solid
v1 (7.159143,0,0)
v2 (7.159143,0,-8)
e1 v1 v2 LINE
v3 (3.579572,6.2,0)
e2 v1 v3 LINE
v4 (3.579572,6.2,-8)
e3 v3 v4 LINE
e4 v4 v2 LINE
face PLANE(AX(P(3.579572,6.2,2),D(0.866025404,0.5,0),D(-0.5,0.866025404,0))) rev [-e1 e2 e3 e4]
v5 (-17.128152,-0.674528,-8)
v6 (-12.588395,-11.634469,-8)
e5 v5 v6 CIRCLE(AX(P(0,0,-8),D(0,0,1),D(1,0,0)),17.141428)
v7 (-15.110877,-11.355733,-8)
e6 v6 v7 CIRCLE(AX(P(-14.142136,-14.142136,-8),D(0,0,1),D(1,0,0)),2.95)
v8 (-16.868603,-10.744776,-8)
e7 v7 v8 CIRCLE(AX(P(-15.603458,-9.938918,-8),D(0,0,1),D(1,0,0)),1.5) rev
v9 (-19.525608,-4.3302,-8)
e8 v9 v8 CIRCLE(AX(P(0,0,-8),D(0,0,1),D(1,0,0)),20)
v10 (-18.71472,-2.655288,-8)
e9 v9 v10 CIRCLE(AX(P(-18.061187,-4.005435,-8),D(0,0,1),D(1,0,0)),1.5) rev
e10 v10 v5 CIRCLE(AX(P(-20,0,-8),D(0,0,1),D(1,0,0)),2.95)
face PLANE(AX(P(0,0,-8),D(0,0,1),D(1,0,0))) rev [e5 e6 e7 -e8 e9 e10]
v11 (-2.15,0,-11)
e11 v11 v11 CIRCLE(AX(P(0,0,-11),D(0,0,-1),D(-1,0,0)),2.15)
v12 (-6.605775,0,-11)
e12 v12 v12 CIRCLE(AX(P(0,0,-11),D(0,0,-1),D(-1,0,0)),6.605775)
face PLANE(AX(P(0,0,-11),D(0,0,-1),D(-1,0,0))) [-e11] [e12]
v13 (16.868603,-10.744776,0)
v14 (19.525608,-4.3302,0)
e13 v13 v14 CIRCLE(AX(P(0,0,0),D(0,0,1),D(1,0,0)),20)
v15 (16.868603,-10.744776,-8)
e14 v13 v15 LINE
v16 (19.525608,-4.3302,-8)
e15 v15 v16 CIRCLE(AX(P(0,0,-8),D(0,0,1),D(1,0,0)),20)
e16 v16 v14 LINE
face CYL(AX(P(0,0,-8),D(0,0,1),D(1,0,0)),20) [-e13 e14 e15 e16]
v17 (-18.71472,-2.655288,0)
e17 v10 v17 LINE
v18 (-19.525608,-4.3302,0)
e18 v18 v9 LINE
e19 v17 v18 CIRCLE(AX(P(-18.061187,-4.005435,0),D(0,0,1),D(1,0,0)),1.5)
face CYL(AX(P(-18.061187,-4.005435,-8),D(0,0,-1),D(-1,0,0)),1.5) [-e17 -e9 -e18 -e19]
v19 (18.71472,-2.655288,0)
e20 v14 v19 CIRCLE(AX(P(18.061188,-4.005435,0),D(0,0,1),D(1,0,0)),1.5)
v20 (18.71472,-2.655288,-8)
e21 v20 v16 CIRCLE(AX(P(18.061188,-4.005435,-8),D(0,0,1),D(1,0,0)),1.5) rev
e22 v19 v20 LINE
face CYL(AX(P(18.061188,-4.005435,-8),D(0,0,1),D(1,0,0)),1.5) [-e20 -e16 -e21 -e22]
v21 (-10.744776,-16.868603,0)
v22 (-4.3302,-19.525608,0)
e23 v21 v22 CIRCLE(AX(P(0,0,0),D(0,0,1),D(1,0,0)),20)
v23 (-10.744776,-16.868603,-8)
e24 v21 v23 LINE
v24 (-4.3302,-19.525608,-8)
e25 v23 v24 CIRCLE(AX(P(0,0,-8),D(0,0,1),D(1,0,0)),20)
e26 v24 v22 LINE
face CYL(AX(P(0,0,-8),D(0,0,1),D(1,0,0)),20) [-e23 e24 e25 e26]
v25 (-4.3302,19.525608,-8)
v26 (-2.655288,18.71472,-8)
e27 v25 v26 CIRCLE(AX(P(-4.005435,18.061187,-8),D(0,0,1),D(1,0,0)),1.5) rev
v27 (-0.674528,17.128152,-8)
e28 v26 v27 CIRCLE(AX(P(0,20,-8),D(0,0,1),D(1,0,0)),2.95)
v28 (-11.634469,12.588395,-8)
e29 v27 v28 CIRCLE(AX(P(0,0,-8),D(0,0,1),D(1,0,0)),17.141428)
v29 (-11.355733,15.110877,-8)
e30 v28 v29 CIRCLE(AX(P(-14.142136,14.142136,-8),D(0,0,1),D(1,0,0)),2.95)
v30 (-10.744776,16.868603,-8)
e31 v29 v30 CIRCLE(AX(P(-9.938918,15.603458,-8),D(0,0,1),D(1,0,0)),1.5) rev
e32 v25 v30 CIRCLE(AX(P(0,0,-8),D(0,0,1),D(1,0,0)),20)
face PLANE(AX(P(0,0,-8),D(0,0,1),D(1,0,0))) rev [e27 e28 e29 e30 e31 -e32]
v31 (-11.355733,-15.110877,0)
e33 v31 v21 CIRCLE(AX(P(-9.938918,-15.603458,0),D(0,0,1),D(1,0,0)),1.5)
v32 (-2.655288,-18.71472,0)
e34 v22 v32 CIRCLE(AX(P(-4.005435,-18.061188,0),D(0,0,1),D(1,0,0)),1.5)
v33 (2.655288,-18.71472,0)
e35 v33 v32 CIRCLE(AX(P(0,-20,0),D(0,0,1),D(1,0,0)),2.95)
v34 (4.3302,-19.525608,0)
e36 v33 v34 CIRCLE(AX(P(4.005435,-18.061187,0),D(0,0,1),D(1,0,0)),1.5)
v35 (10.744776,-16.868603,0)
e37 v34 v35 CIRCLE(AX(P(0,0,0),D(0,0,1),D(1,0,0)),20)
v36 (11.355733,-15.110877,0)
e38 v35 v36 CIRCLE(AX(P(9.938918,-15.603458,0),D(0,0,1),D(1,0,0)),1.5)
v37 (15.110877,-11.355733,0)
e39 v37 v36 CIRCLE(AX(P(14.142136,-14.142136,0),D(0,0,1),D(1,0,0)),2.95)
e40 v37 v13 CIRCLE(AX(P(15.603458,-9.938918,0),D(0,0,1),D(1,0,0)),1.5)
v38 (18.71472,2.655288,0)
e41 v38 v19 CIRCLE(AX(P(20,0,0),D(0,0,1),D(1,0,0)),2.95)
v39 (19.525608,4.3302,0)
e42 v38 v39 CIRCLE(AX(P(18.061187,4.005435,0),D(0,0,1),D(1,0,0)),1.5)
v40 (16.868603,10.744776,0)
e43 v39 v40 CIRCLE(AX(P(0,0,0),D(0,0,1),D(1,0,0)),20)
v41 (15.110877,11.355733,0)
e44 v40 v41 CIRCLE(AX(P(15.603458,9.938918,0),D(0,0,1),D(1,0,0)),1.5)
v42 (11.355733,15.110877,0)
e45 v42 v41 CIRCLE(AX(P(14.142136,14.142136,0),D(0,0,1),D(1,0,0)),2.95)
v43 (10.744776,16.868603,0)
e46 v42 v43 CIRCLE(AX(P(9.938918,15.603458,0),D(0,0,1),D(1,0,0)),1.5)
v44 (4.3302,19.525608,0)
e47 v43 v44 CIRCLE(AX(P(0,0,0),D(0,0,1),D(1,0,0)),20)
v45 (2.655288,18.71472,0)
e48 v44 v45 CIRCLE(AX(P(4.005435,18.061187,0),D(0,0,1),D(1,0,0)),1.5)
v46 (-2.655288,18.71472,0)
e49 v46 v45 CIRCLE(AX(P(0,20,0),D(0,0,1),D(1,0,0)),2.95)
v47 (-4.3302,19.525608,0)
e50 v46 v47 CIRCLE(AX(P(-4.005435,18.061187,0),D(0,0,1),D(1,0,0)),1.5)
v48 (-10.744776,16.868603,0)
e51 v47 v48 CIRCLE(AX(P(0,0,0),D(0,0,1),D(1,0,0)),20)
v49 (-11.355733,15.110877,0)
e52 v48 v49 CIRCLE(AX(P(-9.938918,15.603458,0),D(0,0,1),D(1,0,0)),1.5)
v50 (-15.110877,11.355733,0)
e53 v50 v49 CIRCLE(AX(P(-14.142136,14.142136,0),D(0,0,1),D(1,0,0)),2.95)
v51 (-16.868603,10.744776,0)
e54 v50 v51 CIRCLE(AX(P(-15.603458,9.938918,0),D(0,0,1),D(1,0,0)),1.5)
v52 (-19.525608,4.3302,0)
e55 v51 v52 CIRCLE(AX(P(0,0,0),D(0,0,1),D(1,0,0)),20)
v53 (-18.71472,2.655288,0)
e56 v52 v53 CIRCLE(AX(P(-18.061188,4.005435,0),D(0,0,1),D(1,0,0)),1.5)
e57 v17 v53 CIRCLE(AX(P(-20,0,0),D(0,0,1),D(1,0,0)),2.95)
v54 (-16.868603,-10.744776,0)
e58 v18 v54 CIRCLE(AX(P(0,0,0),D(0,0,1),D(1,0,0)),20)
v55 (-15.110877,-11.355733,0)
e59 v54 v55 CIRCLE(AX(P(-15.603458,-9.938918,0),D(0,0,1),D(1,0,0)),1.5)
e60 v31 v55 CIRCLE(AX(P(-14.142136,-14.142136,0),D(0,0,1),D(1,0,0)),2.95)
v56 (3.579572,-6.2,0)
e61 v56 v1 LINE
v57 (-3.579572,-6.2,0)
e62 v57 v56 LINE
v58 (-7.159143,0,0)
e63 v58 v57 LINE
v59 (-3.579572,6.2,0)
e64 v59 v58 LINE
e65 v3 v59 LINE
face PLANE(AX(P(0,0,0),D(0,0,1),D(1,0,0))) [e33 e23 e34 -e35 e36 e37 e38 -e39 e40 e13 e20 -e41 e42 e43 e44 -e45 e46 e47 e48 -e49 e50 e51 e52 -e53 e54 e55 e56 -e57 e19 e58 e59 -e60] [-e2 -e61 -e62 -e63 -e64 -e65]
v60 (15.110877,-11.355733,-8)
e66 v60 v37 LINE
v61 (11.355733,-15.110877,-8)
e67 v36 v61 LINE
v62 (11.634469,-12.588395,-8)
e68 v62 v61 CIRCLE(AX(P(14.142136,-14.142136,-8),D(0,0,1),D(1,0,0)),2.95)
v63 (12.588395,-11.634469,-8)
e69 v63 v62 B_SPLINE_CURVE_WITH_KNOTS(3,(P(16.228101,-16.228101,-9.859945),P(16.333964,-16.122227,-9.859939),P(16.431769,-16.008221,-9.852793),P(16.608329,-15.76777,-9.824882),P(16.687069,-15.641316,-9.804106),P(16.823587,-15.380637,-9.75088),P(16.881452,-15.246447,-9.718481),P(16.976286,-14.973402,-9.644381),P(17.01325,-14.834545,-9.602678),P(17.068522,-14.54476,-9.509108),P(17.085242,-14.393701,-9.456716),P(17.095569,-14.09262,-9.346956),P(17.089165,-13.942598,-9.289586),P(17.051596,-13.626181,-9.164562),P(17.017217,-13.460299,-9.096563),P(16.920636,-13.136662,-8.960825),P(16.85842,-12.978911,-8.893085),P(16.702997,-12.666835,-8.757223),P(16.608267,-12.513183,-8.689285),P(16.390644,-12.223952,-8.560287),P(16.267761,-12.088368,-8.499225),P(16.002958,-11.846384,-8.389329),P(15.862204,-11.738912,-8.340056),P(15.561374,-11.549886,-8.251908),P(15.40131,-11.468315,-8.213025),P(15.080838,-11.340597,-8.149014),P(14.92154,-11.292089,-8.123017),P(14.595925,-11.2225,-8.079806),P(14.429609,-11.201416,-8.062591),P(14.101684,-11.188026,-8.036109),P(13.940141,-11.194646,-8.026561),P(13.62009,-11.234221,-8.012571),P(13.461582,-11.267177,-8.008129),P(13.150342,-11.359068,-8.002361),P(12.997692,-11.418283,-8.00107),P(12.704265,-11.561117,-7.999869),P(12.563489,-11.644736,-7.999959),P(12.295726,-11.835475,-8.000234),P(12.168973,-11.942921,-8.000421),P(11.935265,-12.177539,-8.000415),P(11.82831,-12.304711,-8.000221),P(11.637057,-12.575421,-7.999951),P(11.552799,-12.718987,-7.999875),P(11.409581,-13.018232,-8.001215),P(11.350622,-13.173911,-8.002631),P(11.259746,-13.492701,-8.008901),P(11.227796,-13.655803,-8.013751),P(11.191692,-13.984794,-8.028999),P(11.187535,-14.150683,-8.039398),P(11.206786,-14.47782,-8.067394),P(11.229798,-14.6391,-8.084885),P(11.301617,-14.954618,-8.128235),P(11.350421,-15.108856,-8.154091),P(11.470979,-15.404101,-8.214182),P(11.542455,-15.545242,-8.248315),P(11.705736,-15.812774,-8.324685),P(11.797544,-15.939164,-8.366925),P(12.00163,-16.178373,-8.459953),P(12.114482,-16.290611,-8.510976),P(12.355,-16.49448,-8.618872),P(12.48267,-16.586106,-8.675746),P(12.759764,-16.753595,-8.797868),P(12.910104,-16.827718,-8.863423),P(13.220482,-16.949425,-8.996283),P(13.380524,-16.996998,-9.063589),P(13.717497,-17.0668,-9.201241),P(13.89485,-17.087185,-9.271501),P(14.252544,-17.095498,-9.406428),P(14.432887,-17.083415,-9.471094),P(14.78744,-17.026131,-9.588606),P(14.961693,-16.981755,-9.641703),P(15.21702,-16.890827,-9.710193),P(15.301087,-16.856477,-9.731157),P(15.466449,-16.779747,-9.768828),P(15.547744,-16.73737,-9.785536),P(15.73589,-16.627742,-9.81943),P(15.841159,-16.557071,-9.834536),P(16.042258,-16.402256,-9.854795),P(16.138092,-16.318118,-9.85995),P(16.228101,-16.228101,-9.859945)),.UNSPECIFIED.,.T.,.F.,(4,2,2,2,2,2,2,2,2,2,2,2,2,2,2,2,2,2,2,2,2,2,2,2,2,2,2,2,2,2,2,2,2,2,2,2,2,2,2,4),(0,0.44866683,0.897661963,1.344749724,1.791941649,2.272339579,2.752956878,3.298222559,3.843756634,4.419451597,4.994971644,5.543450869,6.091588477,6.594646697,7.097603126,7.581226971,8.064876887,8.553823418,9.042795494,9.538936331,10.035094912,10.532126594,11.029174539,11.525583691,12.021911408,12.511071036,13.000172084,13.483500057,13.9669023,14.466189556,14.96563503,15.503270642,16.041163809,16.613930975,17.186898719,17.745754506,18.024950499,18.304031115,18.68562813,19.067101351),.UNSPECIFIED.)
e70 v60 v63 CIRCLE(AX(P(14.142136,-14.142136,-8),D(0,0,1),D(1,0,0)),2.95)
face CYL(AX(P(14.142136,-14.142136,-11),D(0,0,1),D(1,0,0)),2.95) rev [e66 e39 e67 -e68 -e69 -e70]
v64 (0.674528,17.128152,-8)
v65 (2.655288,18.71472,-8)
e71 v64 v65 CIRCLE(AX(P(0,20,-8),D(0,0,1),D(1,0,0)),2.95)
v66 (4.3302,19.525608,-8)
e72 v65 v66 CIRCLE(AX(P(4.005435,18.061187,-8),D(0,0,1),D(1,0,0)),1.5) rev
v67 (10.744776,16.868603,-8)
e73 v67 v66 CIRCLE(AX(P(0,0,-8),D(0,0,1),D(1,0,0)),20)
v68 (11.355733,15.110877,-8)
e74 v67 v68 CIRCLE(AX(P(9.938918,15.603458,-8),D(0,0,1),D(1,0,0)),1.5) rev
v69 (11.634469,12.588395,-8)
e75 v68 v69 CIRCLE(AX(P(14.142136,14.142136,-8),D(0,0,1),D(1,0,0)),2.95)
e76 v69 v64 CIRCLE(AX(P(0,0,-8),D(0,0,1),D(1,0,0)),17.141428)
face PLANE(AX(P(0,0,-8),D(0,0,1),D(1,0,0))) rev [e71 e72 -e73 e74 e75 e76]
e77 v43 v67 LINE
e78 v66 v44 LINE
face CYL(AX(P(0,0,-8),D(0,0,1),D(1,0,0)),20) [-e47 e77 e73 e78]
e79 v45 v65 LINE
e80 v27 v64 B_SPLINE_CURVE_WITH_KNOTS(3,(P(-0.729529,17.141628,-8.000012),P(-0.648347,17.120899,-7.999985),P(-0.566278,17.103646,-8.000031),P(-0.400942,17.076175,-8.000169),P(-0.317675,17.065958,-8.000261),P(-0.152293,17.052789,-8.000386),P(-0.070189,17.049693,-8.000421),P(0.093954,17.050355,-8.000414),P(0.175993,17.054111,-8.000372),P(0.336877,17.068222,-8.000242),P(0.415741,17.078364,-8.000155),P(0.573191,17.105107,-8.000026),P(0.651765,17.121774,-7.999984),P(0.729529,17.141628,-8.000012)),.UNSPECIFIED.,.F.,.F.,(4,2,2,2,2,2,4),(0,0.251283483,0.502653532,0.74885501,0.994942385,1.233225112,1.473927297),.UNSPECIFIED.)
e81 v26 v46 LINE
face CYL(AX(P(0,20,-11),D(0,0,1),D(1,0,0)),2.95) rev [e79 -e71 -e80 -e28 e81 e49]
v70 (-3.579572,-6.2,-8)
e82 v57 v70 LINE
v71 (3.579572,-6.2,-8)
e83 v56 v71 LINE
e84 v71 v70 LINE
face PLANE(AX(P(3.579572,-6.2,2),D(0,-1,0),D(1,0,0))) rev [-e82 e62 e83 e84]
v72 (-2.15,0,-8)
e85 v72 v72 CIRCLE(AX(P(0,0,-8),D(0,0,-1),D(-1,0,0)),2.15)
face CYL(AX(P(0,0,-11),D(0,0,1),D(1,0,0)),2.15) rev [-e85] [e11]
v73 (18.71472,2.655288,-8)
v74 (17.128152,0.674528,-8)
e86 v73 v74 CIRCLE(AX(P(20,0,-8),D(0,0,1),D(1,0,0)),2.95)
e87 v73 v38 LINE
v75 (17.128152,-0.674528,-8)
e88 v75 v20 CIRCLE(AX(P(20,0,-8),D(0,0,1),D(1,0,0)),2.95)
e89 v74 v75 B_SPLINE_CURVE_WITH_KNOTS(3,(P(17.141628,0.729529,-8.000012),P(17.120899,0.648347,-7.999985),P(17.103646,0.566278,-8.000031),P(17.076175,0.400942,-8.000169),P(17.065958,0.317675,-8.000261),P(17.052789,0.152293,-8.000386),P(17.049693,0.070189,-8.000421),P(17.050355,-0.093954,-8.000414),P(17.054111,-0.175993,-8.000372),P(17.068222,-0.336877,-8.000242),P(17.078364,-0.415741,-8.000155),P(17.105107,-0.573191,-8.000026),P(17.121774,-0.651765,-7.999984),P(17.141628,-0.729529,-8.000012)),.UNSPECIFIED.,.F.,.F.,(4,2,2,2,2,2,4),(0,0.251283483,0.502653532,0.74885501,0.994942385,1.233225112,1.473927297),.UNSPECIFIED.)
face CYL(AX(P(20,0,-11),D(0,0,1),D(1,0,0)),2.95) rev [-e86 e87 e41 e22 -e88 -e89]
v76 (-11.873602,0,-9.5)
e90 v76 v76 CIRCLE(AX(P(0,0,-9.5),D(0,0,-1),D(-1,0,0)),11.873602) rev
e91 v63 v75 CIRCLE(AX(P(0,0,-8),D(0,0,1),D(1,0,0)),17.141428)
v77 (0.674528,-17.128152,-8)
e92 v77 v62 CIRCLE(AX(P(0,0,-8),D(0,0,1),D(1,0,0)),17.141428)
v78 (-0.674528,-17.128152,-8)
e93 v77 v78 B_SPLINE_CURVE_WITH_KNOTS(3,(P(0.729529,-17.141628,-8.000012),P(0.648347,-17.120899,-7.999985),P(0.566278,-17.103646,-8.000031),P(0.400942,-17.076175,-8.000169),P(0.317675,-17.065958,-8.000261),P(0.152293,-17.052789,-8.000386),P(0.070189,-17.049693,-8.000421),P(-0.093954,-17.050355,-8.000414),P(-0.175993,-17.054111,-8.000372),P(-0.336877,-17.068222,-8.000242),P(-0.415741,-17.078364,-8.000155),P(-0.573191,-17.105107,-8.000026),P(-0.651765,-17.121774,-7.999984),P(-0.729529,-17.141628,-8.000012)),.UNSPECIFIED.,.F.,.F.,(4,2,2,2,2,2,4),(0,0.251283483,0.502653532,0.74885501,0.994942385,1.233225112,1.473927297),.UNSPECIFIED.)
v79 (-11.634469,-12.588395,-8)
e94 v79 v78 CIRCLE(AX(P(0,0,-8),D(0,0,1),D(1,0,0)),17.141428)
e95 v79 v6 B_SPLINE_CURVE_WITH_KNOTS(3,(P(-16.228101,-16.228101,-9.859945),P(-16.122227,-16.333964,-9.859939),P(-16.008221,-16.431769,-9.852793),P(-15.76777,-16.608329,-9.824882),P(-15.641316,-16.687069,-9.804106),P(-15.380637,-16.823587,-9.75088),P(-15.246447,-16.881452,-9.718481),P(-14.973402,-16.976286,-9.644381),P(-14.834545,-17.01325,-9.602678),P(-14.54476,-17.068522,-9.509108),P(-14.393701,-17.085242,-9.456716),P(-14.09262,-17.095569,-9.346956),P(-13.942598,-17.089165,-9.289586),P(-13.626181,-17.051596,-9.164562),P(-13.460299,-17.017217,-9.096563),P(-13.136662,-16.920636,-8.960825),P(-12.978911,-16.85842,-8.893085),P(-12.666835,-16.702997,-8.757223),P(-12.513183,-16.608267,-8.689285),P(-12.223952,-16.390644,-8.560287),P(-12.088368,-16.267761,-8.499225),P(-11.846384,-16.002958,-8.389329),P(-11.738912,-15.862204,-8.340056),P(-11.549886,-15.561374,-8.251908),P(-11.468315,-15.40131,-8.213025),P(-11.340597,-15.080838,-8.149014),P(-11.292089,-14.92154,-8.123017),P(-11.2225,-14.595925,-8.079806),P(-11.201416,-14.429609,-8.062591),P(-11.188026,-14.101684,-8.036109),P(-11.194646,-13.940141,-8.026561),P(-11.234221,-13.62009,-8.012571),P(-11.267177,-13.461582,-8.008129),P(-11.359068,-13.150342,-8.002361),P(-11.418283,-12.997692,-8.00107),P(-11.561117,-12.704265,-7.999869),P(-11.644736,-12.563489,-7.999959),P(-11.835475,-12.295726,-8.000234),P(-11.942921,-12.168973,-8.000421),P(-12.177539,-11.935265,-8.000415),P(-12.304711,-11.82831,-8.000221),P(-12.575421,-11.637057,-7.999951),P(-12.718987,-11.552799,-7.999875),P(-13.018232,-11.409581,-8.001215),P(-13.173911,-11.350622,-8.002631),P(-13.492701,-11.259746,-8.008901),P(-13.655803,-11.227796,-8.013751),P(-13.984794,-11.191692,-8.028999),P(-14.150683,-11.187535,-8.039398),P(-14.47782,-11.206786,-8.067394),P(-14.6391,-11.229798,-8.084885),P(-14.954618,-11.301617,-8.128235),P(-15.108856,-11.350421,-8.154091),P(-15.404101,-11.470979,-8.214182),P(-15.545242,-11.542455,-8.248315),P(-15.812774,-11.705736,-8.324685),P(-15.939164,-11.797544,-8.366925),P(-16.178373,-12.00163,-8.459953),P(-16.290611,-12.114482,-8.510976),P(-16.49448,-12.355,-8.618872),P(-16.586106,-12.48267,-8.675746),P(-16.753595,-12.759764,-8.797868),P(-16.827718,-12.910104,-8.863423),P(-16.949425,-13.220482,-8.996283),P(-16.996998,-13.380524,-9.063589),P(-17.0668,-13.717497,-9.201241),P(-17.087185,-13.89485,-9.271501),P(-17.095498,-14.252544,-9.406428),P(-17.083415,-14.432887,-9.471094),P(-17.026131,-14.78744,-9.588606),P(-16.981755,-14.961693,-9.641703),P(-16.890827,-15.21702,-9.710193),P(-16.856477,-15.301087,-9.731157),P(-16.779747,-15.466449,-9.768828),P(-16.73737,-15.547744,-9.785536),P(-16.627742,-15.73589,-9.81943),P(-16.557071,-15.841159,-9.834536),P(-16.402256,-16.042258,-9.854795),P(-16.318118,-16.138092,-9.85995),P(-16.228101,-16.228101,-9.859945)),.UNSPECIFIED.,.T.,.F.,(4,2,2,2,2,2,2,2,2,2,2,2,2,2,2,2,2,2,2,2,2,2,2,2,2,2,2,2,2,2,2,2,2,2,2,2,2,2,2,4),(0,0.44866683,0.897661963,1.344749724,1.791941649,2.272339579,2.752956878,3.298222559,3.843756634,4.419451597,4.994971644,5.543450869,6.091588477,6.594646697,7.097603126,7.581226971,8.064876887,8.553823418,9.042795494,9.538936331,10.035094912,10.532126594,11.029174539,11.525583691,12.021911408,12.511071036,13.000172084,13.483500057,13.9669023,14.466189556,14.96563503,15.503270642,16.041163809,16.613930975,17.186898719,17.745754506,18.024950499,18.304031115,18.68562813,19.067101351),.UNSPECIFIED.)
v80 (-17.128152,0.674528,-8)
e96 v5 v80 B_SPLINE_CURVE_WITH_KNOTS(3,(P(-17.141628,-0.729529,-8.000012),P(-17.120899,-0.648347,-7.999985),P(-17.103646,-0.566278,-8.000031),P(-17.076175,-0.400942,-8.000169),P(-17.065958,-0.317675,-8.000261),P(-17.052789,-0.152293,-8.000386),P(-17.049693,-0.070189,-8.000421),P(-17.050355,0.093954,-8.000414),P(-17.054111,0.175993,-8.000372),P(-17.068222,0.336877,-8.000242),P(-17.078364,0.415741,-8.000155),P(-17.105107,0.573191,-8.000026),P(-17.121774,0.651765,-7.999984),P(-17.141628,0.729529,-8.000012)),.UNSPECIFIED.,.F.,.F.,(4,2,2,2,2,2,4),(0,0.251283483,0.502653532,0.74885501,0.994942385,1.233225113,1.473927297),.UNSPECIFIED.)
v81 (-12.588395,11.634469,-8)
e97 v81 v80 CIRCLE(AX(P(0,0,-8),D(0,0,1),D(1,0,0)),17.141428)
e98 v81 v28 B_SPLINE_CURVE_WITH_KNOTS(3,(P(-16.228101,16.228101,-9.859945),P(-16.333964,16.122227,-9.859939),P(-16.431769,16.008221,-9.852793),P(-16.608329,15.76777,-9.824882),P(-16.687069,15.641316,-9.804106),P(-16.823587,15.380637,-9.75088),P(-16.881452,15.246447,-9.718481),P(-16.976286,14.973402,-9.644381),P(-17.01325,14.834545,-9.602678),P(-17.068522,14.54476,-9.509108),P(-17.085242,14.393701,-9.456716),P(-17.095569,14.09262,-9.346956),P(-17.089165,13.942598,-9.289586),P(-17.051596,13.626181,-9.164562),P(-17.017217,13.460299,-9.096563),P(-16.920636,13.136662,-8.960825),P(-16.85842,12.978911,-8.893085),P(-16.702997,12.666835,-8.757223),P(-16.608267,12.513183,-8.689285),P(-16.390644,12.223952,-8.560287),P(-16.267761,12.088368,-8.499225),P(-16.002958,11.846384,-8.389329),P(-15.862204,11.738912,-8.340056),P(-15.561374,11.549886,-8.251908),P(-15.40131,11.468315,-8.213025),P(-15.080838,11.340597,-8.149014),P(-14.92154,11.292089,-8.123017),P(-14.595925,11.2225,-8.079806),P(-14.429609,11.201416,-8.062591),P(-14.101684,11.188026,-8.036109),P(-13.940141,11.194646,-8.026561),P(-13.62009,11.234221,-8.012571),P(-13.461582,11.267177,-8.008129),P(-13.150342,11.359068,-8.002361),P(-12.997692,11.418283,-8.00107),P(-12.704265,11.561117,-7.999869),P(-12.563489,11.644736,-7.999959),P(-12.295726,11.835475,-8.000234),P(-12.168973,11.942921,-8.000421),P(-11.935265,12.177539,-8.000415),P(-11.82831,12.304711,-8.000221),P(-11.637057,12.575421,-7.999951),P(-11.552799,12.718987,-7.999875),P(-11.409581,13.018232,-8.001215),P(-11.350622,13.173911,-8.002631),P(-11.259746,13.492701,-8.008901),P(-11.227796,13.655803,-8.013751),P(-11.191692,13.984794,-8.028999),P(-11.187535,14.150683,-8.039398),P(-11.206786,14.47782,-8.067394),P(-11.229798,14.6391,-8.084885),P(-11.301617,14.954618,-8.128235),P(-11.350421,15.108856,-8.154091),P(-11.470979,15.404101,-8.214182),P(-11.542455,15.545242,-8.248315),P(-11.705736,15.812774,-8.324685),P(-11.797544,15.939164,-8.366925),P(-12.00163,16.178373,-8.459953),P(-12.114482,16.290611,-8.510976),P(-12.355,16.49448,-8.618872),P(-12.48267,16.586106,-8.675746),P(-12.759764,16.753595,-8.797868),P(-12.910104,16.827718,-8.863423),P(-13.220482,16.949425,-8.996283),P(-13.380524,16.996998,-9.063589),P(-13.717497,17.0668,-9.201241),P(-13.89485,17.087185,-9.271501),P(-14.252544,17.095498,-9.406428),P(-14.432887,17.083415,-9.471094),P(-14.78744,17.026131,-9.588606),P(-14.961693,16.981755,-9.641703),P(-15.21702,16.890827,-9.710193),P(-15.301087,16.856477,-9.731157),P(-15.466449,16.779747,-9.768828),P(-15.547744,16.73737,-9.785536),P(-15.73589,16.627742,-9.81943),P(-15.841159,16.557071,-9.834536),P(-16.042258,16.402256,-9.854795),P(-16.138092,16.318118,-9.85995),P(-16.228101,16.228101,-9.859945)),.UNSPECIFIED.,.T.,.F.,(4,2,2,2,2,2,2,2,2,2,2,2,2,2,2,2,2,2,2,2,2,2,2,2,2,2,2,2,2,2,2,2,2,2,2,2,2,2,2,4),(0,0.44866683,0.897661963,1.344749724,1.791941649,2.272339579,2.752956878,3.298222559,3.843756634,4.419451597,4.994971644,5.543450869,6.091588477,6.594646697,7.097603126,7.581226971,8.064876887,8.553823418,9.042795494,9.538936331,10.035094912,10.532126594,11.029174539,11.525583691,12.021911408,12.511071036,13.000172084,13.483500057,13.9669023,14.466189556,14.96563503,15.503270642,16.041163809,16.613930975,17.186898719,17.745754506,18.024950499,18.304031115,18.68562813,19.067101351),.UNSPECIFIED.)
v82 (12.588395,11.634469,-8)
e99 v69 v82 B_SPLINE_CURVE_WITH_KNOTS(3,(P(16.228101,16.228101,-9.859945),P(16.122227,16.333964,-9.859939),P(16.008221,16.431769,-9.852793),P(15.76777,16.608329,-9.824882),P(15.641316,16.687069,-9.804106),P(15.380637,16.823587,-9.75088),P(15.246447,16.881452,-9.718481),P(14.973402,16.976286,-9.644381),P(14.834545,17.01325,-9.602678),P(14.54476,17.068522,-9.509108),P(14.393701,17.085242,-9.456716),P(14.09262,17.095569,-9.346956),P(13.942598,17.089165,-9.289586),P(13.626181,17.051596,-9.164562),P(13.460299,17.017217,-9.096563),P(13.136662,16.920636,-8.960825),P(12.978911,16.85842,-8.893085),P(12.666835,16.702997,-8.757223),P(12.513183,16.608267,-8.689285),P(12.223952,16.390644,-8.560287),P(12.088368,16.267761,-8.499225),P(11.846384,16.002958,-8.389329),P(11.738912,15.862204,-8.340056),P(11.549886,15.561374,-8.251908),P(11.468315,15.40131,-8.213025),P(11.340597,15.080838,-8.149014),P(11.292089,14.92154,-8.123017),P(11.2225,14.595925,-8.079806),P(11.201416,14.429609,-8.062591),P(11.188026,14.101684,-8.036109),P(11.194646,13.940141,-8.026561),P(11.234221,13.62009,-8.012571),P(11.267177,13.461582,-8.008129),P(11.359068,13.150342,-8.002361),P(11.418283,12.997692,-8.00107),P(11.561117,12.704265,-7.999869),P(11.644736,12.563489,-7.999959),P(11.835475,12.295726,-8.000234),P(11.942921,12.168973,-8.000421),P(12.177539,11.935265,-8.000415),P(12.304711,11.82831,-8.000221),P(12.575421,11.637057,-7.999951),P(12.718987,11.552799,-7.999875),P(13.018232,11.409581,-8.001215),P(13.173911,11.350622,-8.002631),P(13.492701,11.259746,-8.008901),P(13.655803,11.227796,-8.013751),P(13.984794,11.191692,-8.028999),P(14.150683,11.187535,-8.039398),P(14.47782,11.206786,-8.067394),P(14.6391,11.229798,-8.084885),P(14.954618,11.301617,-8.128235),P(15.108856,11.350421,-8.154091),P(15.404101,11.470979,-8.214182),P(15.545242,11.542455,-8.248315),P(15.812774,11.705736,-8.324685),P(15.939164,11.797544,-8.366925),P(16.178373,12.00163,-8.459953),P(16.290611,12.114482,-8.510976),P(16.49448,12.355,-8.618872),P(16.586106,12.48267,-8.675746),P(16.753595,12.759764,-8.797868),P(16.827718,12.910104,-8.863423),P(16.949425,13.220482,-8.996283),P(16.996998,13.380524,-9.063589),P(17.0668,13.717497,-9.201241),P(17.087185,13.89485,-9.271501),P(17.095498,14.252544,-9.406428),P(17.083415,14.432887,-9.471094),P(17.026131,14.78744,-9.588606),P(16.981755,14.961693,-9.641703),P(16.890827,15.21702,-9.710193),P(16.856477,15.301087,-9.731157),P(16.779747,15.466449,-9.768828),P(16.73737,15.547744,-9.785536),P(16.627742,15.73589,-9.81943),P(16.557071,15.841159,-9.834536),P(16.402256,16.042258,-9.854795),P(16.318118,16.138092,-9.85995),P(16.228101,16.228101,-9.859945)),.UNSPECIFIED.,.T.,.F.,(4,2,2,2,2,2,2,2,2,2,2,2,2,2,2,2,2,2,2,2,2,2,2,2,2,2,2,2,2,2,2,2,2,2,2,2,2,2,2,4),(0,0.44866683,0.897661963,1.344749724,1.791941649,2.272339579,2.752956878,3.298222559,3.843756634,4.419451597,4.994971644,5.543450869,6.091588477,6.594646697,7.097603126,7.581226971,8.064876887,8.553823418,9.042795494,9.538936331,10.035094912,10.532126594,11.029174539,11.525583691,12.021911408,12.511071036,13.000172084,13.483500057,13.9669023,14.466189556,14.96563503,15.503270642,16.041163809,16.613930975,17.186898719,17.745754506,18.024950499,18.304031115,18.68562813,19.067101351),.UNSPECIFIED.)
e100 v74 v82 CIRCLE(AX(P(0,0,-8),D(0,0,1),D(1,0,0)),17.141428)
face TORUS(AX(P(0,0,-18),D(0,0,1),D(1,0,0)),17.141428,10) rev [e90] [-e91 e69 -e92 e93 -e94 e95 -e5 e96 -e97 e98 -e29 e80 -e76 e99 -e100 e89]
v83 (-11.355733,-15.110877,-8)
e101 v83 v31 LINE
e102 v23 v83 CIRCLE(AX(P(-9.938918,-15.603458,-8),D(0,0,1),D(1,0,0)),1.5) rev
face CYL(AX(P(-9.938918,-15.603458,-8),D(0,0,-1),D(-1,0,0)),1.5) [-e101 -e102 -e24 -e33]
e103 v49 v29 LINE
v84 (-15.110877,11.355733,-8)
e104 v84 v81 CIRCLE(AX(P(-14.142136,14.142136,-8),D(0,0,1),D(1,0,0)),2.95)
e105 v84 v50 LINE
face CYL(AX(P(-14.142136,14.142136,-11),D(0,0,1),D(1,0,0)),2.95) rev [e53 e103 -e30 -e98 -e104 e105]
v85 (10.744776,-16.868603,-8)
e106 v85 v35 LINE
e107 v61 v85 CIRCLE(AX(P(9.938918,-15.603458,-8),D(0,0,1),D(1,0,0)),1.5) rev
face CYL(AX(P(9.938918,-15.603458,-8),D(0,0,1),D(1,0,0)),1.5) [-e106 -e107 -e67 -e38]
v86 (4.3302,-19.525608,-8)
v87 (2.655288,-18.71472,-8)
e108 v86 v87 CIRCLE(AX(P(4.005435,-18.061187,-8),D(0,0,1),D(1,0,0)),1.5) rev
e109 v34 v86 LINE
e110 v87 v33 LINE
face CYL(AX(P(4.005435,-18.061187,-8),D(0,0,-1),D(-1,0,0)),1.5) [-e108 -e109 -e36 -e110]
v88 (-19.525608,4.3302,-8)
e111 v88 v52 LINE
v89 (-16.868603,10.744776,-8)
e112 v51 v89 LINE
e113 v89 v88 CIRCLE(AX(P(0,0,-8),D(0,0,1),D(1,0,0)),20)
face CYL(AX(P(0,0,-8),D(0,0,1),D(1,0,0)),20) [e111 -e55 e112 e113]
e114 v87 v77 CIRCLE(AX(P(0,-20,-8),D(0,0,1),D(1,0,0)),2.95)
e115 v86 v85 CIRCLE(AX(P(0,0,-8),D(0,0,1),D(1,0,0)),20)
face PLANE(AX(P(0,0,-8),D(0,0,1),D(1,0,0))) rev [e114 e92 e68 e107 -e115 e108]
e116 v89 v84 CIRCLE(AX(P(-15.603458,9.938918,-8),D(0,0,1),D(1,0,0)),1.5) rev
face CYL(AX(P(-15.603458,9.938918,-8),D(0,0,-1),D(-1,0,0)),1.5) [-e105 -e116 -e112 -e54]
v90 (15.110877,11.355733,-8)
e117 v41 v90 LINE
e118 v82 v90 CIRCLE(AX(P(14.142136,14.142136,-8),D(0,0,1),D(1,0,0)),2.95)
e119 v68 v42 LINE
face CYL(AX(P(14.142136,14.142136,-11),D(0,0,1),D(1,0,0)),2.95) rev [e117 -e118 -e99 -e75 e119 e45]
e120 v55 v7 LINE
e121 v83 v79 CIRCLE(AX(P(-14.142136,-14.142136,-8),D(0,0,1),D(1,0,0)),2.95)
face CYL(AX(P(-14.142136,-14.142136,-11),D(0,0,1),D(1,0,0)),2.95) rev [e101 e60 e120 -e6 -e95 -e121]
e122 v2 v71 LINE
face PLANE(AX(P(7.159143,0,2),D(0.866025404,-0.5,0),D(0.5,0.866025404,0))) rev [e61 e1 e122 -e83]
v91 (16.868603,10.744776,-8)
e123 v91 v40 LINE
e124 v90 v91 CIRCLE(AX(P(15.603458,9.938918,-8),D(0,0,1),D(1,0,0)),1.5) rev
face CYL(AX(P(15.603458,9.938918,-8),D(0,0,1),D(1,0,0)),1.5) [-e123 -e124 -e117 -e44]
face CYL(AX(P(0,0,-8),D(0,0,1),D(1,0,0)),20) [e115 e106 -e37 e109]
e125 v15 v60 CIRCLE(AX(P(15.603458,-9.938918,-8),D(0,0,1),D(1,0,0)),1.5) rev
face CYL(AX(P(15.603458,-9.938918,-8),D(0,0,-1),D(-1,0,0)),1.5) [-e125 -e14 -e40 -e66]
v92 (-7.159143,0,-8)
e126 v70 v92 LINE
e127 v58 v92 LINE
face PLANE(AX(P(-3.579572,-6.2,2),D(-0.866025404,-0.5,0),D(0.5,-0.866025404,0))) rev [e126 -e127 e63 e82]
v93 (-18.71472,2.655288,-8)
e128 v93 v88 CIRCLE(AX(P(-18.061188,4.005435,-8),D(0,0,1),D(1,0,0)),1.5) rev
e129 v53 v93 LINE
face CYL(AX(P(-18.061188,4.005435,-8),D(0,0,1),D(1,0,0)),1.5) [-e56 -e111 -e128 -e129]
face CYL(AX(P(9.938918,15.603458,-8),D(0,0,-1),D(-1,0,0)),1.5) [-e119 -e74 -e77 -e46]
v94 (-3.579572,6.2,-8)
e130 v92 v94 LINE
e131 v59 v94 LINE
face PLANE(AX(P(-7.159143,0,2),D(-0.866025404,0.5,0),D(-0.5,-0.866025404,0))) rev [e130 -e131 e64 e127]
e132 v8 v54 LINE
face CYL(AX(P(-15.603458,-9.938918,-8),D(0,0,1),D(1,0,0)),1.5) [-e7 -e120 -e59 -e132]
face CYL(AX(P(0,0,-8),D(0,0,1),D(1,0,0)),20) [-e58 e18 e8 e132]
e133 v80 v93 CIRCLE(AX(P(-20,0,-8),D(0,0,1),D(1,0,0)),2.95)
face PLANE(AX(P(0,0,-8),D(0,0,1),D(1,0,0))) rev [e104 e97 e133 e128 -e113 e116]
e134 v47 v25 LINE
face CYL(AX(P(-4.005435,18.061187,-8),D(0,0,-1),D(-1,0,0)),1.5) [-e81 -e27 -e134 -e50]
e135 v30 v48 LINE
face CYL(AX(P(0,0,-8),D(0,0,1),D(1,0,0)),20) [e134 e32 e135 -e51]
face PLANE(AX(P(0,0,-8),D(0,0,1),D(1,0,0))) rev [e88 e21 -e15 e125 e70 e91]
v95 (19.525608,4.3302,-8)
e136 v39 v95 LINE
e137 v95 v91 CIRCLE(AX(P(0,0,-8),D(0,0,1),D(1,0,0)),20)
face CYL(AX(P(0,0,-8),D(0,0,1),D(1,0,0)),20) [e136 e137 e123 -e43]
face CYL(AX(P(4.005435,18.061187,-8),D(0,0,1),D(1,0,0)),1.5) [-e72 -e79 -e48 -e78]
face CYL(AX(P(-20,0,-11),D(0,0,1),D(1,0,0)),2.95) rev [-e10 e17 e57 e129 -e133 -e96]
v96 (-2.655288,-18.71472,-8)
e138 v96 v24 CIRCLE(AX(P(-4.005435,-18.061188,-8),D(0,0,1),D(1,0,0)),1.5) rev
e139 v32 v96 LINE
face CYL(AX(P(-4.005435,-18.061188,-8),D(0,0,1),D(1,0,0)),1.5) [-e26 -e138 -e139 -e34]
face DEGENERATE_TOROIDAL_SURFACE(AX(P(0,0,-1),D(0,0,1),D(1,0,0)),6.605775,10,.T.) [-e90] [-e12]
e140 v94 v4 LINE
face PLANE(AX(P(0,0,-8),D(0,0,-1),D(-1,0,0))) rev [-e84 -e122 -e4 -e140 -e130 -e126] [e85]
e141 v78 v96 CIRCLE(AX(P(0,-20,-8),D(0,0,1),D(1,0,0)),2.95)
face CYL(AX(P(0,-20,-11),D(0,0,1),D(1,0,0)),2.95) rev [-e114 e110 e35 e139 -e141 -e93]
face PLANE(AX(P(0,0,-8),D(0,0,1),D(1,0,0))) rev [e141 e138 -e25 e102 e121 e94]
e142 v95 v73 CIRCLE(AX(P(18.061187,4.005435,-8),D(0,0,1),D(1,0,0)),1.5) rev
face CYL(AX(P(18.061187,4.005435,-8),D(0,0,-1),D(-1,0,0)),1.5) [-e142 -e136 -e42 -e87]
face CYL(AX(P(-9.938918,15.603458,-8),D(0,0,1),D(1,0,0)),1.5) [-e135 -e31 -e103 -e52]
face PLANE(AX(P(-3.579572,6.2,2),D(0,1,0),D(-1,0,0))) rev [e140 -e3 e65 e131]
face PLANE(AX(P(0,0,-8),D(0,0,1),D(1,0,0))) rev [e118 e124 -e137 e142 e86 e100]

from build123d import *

# Parameters (mm, degrees)
CROQUIS1_R              = 20
SALIENTE_EXTRUIR1_DEPTH = 8
CORTAR_EXTRUIR1_DEPTH   = 8
CORTAR_EXTRUIR2_DEPTH   = 10
CROQUIS4_R              = 10
CROQUIS4_R_2            = 2.15
SALIENTE_EXTRUIR2_DEPTH = 3
REDONDEO1_R             = 10
REDONDEO2_R             = 10
CROQUIS5_R              = 2.95
CORTAR_EXTRUIR4_DEPTH   = 31.099222036
REDONDEO4_R             = 1.5


with BuildPart() as part:
    # Croquis1 → Saliente-Extruir1 (new body)
    with BuildSketch(Plane.XY):
        Circle(CROQUIS1_R)
        with BuildLine():
            Line((-1.204159458, 1.2), (1.204159458, 1.2))
            ThreePointArc((1.204159458, 1.2), (0, -1.7), (-1.204159458, 1.2))
        make_face(mode=Mode.SUBTRACT)
    extrude(amount=-SALIENTE_EXTRUIR1_DEPTH)

    # Croquis2 → Cortar-Extruir1 (cut)
    with BuildSketch(Plane.XY):
        with BuildLine():
            ThreePointArc((2.743493279, 19.8109375), (0, 20), (-2.743493279, 19.8109375))
            ThreePointArc((-2.743493279, 19.8109375), (0, 17.25), (2.743493279, 19.8109375))
        make_face()
        with BuildLine():
            ThreePointArc((-15.948597043, 12.068233192), (-12.197270604, 12.196913347), (-12.068700327, 15.948243553))
            ThreePointArc((-12.068700327, 15.948243553), (-14.142342736, 14.141928508), (-15.948597043, 12.068233192))
        make_face()
        with BuildLine():
            ThreePointArc((15.948184756, 12.068778024), (14.141928523, 14.142342722), (12.068310924, 15.948538223))
            ThreePointArc((12.068310924, 15.948538223), (12.197913345, 12.198270606), (15.948184756, 12.068778024))
        make_face()
        with BuildLine():
            ThreePointArc((-19.810790862, -2.744551953), (-17.249000003, -0.000862493), (-19.811065232, 2.742570761))
            ThreePointArc((-19.811065232, 2.742570761), (-19.999999975, -0.00100005), (-19.810790862, -2.744551953))
        make_face()
        with BuildLine():
            ThreePointArc((19.811084118, -2.742434336), (19.999999975, 0.00099995), (19.810809789, 2.744415332))
            ThreePointArc((19.810809789, 2.744415332), (17.251000003, 0.000862507), (19.811084118, -2.742434336))
        make_face()
        with BuildLine():
            ThreePointArc((-12.06710539, -15.949450383), (-12.196050859, -12.198133106), (-15.947390094, -12.069828051))
            ThreePointArc((-15.947390094, -12.069828051), (-14.140928423, -14.143342722), (-12.06710539, -15.949450383))
        make_face()
        with BuildLine():
            ThreePointArc((12.069905665, -15.947331352), (14.143342636, -14.140928508), (15.949391508, -12.067183206))
            ThreePointArc((15.949391508, -12.067183206), (12.199133118, -12.197050847), (12.069905665, -15.947331352))
        make_face()
        with BuildLine():
            ThreePointArc((2.745474352, -19.810663053), (0.001725, -17.250000014), (-2.741512165, -19.811211751))
            ThreePointArc((-2.741512165, -19.811211751), (0.002, -19.9999999), (2.745474352, -19.810663053))
        make_face()
    extrude(amount=-CORTAR_EXTRUIR1_DEPTH, mode=Mode.SUBTRACT)

    # Croquis3 → Cortar-Extruir2 (cut)
    with BuildSketch(Plane(origin=(0, 0, -8), x_dir=(-1, 0, 0), z_dir=(0, 0, -1))):
        Polygon((7.159143338, 0), (3.579571669, 6.2), (-3.579571669, 6.2), (-7.159143338, 0), (-3.579571669, -6.2), (3.579571669, -6.2), align=None)
    extrude(amount=-CORTAR_EXTRUIR2_DEPTH, mode=Mode.SUBTRACT)

    # Croquis4 → Saliente-Extruir2 (add)
    with BuildSketch(Plane(origin=(0, 0, -8), x_dir=(-1, 0, 0), z_dir=(0, 0, -1))):
        with Locations(Location((0, 0, 0), (0, 0, 180))):
            Circle(CROQUIS4_R)
        Circle(CROQUIS4_R_2, mode=Mode.SUBTRACT)
    extrude(amount=SALIENTE_EXTRUIR2_DEPTH)

    # Redondeo1
    # the kernel refuses this fillet: 10 mm, written as the material it adds along each edge
    with BuildSketch(Plane(origin=(0, 0, -8), x_dir=(1, 0, 0), z_dir=(0, 1, 0))) as redondeo1_piece_1:
        with BuildLine():
            CenterArc((17.141428429, 10), REDONDEO1_R, 224.427004001, 45.572995999)
            Line((10, 3), (9.857171431, 2.86))
            ThreePointArc((9.857171431, 2.86), (9.8, 1.5), (9.8, 0))
            Line((9.8, 0), (10, -0.2))
            Line((10, -0.2), (17.141428429, -0.2))
            Line((17.141428429, -0.2), (17.141428429, 0))
        make_face()
    revolve(axis=Axis((0, 0, -8), (0, 0, -1)))

    # Redondeo2
    redondeo2_edges = [part.edges().sort_by_distance(p)[0] for p in [
        (-10, 0, -11),
    ]]
    fillet(redondeo2_edges, radius=REDONDEO2_R)

    # Croquis5 → Cortar-Extruir4 (cut, through all)
    with BuildSketch(Plane.XY):
        with Locations((0, 20)):
            Circle(CROQUIS5_R)
        with Locations((14.142135624, 14.142135624)):
            Circle(CROQUIS5_R)
        with Locations((20, 0)):
            Circle(CROQUIS5_R)
        with Locations((14.142135624, -14.142135624)):
            Circle(CROQUIS5_R)
        with Locations((0, -20)):
            Circle(CROQUIS5_R)
        with Locations((-14.142135624, -14.142135624)):
            Circle(CROQUIS5_R)
        with Locations((-20, 0)):
            Circle(CROQUIS5_R)
        with Locations((-14.142135624, 14.142135624)):
            Circle(CROQUIS5_R)
    extrude(amount=-CORTAR_EXTRUIR4_DEPTH, mode=Mode.SUBTRACT)

    # Redondeo4
    redondeo4_edges = [part.edges().sort_by_distance(p)[0] for p in [
        (-11.908011282, 16.068580127, -4),
        (-16.068580127, 11.908011282, -4),
        (-19.7824375, -2.941966444, -4),
        (-19.7824375, 2.941966444, -4),
        (-16.068580127, -11.908011282, -4),
        (-11.908011282, -16.068580127, -4),
        (2.941966444, -19.7824375, -4),
        (-2.941966444, -19.7824375, -4),
        (11.908011282, -16.068580127, -4),
        (16.068580127, -11.908011282, -4),
        (19.7824375, 2.941966444, -4),
        (19.7824375, -2.941966444, -4),
        (11.908011282, 16.068580127, -4),
        (16.068580127, 11.908011282, -4),
        (-2.941966444, 19.7824375, -4),
        (2.941966444, 19.7824375, -4),
    ]]
    fillet(redondeo4_edges, radius=REDONDEO4_R)


solid = part.part
